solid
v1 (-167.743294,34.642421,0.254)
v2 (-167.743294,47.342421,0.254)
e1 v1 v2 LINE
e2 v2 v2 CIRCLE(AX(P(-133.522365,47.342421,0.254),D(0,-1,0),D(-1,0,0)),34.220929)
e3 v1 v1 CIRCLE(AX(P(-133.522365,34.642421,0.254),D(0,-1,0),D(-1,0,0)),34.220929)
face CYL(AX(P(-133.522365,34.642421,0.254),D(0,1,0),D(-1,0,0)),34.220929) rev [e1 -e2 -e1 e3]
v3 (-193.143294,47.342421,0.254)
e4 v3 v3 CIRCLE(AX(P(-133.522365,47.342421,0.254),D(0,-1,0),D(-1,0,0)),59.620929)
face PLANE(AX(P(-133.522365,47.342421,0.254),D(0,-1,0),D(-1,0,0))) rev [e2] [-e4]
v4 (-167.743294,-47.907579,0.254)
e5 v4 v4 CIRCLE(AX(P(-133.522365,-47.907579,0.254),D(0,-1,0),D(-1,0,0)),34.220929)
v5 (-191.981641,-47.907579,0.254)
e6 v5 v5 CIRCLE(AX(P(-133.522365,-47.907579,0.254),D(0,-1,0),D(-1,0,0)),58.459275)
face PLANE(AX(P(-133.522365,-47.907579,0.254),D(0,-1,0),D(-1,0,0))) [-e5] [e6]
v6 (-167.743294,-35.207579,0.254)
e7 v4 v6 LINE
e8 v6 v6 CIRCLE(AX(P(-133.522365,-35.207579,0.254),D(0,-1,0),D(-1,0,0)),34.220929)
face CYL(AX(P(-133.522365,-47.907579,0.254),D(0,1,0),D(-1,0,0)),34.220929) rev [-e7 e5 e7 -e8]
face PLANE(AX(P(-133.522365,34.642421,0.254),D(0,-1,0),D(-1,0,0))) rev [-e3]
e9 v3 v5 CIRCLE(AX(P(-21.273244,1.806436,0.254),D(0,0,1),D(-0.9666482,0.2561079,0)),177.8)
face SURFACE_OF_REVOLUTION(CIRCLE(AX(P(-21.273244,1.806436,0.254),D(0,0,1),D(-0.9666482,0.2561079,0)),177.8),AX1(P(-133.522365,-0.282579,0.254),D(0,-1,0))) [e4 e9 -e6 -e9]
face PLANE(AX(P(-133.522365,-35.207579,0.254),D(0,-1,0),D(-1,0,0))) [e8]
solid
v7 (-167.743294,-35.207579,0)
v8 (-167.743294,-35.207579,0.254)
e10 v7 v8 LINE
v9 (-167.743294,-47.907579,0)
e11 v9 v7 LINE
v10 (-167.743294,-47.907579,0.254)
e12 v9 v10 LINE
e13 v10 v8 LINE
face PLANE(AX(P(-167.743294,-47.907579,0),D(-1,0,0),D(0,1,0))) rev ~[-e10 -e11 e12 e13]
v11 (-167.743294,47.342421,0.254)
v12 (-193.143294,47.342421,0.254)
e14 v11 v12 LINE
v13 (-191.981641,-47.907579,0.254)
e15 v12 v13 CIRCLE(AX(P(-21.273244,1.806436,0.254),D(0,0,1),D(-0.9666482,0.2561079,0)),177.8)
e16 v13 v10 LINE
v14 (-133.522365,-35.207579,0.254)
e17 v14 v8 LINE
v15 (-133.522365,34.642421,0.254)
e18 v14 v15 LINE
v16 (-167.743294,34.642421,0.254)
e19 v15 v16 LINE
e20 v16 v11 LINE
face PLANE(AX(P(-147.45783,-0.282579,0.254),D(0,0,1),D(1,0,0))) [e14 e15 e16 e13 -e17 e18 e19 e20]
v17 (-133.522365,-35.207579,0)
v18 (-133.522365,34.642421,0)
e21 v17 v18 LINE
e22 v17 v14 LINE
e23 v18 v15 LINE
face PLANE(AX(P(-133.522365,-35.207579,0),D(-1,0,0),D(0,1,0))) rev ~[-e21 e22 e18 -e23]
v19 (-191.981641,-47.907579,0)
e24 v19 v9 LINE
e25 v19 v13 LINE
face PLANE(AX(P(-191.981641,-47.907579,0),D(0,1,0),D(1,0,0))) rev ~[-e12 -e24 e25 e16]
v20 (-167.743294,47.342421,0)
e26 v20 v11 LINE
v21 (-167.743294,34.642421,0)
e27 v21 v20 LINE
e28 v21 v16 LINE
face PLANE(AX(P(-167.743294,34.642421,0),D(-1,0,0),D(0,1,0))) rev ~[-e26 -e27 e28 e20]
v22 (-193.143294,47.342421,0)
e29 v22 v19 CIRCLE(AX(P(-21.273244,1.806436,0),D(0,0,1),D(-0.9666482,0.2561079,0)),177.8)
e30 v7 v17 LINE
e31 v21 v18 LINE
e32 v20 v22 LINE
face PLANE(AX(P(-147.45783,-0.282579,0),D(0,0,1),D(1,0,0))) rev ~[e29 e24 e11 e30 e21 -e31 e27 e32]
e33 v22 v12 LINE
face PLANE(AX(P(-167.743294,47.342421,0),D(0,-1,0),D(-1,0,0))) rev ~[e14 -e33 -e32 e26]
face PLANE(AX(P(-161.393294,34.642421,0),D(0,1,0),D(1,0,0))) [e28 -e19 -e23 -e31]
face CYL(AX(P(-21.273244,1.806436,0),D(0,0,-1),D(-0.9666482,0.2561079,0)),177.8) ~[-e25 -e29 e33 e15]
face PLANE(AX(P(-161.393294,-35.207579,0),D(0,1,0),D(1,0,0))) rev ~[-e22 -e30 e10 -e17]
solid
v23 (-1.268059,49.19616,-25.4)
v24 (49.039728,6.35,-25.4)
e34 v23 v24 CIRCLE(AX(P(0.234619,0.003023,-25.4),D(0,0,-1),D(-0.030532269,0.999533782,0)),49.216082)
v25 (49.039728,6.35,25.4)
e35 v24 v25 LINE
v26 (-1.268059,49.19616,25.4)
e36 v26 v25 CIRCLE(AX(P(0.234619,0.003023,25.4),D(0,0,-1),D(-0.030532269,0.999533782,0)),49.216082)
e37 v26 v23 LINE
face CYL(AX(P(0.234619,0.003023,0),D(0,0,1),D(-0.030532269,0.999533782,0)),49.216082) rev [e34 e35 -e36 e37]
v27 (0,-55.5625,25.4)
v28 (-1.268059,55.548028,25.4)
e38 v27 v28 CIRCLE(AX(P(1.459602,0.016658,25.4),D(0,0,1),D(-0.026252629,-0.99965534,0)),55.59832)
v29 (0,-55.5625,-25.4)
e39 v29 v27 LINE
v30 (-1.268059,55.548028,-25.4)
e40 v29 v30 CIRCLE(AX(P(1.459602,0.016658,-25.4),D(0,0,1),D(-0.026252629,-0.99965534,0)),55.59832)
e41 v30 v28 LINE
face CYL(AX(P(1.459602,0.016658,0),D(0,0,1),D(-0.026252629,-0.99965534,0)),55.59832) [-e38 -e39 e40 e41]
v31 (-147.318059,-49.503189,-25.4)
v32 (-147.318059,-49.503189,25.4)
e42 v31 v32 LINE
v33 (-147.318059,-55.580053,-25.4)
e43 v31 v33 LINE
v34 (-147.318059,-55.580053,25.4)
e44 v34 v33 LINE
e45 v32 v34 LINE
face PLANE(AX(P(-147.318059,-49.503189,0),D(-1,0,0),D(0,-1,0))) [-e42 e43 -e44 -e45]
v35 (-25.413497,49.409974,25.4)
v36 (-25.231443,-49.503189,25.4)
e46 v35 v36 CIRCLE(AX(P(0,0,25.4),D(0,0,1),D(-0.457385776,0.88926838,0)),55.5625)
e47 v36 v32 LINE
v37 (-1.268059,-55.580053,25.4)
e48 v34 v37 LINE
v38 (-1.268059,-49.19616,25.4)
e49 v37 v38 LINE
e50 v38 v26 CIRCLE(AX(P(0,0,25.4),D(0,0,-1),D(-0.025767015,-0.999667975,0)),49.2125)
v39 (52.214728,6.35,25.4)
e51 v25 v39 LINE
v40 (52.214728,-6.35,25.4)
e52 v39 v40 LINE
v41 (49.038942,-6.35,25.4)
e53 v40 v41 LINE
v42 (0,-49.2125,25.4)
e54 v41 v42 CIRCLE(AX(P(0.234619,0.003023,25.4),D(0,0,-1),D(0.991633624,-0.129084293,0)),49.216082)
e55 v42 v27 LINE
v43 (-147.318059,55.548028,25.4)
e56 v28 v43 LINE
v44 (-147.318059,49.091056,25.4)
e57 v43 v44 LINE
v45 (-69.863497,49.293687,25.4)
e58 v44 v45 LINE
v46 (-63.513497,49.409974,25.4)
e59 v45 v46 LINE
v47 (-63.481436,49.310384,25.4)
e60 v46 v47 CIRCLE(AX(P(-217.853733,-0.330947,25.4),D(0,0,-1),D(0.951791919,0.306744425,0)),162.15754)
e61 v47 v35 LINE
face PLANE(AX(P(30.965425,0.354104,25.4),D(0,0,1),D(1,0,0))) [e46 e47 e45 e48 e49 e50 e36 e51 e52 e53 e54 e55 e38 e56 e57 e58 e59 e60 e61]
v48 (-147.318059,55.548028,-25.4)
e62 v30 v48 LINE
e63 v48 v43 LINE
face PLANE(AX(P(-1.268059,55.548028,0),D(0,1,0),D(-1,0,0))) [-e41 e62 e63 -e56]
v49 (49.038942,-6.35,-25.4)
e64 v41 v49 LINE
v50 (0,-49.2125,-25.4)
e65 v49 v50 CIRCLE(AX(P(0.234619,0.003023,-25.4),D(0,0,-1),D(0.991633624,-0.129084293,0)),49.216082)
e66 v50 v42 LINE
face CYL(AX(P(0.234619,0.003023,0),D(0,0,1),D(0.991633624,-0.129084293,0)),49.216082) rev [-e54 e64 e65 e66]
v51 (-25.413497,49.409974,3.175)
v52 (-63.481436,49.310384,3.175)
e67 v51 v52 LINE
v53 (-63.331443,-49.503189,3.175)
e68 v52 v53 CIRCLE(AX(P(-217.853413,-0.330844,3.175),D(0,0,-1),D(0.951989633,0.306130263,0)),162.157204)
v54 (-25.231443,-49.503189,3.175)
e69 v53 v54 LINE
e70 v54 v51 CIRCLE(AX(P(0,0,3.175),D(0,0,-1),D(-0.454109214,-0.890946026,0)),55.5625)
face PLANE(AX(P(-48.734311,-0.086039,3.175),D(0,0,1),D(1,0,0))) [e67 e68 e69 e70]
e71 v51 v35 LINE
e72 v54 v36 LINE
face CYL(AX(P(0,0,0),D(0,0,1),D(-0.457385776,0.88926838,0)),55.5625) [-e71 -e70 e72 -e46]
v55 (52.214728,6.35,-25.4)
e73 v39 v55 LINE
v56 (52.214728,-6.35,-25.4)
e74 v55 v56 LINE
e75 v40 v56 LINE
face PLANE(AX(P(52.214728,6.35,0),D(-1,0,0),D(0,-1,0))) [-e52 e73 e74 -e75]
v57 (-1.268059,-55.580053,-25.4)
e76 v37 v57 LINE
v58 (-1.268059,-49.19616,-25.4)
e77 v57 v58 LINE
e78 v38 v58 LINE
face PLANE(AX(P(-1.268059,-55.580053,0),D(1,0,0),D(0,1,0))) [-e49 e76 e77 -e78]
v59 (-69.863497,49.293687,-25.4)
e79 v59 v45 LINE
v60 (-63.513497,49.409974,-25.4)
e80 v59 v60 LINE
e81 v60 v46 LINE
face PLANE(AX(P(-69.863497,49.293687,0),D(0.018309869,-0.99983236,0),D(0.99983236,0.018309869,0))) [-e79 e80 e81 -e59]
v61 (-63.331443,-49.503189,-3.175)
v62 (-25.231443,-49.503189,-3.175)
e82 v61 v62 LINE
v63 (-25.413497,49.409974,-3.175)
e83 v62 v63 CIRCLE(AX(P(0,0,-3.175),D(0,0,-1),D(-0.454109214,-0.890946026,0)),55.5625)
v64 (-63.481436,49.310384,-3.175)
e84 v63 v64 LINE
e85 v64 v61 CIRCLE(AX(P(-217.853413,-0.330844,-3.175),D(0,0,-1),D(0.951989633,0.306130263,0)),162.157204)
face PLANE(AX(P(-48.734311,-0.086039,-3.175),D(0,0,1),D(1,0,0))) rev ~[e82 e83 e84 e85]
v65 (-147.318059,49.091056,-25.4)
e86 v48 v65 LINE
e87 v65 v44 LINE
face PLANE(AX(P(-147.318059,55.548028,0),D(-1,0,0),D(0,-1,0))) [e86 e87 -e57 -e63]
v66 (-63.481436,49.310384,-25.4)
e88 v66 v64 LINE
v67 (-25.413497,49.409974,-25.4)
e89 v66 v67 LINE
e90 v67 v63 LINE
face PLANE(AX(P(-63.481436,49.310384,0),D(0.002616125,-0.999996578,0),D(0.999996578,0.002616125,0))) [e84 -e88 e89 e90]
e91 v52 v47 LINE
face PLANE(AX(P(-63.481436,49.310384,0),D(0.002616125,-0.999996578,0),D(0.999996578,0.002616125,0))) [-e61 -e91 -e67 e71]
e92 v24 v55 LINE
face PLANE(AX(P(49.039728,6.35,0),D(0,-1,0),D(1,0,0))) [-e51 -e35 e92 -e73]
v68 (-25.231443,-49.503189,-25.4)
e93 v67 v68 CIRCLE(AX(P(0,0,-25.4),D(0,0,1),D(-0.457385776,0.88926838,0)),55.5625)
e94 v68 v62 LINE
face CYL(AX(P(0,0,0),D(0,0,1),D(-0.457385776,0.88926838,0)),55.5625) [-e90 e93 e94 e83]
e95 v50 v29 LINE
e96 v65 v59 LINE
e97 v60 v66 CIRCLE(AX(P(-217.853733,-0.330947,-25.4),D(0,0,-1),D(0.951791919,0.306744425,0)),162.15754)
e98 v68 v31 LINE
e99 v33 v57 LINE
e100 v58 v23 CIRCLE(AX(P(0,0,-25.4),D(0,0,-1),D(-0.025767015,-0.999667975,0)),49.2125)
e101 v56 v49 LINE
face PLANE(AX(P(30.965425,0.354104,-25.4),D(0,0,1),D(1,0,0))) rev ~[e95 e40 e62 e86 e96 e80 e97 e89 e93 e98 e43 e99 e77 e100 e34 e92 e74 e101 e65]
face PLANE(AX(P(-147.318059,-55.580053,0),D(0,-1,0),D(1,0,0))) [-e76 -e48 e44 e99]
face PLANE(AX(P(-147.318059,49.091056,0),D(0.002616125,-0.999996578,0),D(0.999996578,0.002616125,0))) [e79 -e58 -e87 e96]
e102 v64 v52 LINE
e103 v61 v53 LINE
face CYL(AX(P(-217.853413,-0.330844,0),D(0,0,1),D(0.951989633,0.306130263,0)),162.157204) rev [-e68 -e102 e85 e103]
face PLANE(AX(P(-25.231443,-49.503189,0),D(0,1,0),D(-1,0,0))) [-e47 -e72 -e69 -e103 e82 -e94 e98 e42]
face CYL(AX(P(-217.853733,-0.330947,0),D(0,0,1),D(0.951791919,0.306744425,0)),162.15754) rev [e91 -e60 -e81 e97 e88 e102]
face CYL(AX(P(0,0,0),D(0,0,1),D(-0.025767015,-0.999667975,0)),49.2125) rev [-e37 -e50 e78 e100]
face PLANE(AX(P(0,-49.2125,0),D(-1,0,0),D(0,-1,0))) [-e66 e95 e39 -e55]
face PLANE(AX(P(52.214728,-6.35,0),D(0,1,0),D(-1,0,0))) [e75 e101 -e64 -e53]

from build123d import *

# Parameters (mm, degrees)
F1_DEPTH = 25.4
F2_DEPTH = 0.254
F0_W     = 27.8709288151
F0_H     = 69.85
F3_DEPTH = 0.254
F5_DEPTH = 3.175
F6_DEPTH = 25.4


# Not quite as in the source:
# - the program builds the solid bodies; features that only make, move or delete a surface that nothing else refers to are left out


with BuildPart() as f1:
    # F0 (on Top) → F1 (new body, symmetric)
    with BuildSketch(Plane.XY):
        with BuildLine():
            ThreePointArc((-1.2680592233, -49.1961602369), (-49.2125, 0), (-1.2680592233, 49.1961602369))
            Line((-1.2680592233, 49.1961602369), (-1.2680592233, 55.5480281563))
            Line((-1.2680592233, 55.5480281563), (-147.3180592233, 55.5480281563))
            Line((-147.3180592233, 55.5480281563), (-147.3180592233, 49.091055685))
            Line((-147.3180592233, 49.091055685), (-69.8634971885, 49.2936872058))
            Line((-69.8634971885, 49.2936872058), (-63.5134971885, 49.4099743665))
            ThreePointArc((-63.5134971885, 49.4099743665), (-63.4974587718, 49.3601815353), (-63.4814364191, 49.3103835326))
            Line((-63.4814364191, 49.3103835326), (-25.4134971885, 49.4099743665))
            ThreePointArc((-25.4134971885, 49.4099743665), (-55.5624058885, -0.1022650226), (-25.2314432137, -49.5031885802))
            Line((-25.2314432137, -49.5031885802), (-63.3314432137, -49.5031885802))
            Line((-63.3314432137, -49.5031885802), (-69.6814432137, -49.5031885802))
            Line((-69.6814432137, -49.5031885802), (-147.3180592233, -49.5031885802))
            Line((-147.3180592233, -49.5031885802), (-147.3180592233, -55.5800534785))
            Line((-147.3180592233, -55.5800534785), (-1.2680592233, -55.5800534785))
            Line((-1.2680592233, -55.5800534785), (-1.2680592233, -49.1961602369))
        make_face()
    extrude(amount=F1_DEPTH, both=True)

    # F0 (on Top) → F5 (join, symmetric)
    with BuildSketch(Plane.XY):
        with BuildLine():
            ThreePointArc((49.0389416617, -6.35), (32.6236991353, -37.0532891725), (0, -49.2125))
            Line((0, -49.2125), (0, -55.5625))
            ThreePointArc((0, -55.5625), (57.0543020001, 0.6511375212), (-1.2680592233, 55.5480281563))
            Line((-1.2680592233, 55.5480281563), (-1.2680592233, 49.1961602369))
            ThreePointArc((-1.2680592233, 49.1961602369), (32.1458766832, 37.4716025001), (49.0397283671, 6.35))
            Line((49.0397283671, 6.35), (52.2147283671, 6.35))
            Line((52.2147283671, 6.35), (52.2147283671, -6.35))
            Line((52.2147283671, -6.35), (49.0389416617, -6.35))
        make_face()
        with BuildLine():
            Line((-25.4134971885, 49.4099743665), (-63.4814364191, 49.3103835326))
            ThreePointArc((-63.4814364191, 49.3103835326), (-55.6963964132, -0.0846991302), (-63.3314432137, -49.5031885802))
            Line((-63.3314432137, -49.5031885802), (-25.2314432137, -49.5031885802))
            ThreePointArc((-25.2314432137, -49.5031885802), (-55.5624058885, -0.1022650226), (-25.4134971885, 49.4099743665))
        make_face()
    extrude(amount=F5_DEPTH, both=True)

    # F0 (on Top) → F6 (join, symmetric)
    with BuildSketch(Plane.XY):
        with BuildLine():
            ThreePointArc((49.0389416617, -6.35), (32.6236991353, -37.0532891725), (0, -49.2125))
            Line((0, -49.2125), (0, -55.5625))
            ThreePointArc((0, -55.5625), (57.0543020001, 0.6511375212), (-1.2680592233, 55.5480281563))
            Line((-1.2680592233, 55.5480281563), (-1.2680592233, 49.1961602369))
            ThreePointArc((-1.2680592233, 49.1961602369), (32.1458766832, 37.4716025001), (49.0397283671, 6.35))
            Line((49.0397283671, 6.35), (52.2147283671, 6.35))
            Line((52.2147283671, 6.35), (52.2147283671, -6.35))
            Line((52.2147283671, -6.35), (49.0389416617, -6.35))
        make_face()
    extrude(amount=F6_DEPTH, both=True)


with BuildPart() as f2:
    # F0 (on Top) → F2 (new body)
    with BuildSketch(Plane.XY):
        with BuildLine():
            Line((-167.7432940599, 47.3424206634), (-193.1432940599, 47.3424206634))
            ThreePointArc((-193.1432940599, 47.3424206634), (-199.0600226604, -0.3618224561), (-191.9816406704, -47.9075793366))
            Line((-191.9816406704, -47.9075793366), (-167.7432940599, -47.9075793366))
            Line((-167.7432940599, -47.9075793366), (-167.7432940599, -35.2075793366))
            Line((-167.7432940599, -35.2075793366), (-161.3932940599, -35.2075793366))
            Line((-161.3932940599, -35.2075793366), (-161.3932940599, 34.6424206634))
            Line((-161.3932940599, 34.6424206634), (-167.7432940599, 34.6424206634))
            Line((-167.7432940599, 34.6424206634), (-167.7432940599, 47.3424206634))
        make_face()
    extrude(amount=F2_DEPTH)

    # F0 (on Top) → F3 (join)
    with BuildSketch(Plane.XY):
        with Locations((-147.4578296524, -0.2825793366)):
            Rectangle(F0_W, F0_H)
    extrude(amount=F3_DEPTH)


with BuildPart() as f4:
    # F2_face (on face) → F4 (revolve)
    with BuildSketch(Plane(origin=(-167.7046477671, -0.1151986196, 0.254), x_dir=(1, 0, 0), z_dir=(0, 0, 1))):
        with BuildLine():
            Line((34.1822825223, 34.7576192829), (-0.0386462928, 34.7576192829))
            Line((-0.0386462928, 34.7576192829), (-0.0386462928, 47.4576192829))
            Line((-0.0386462928, 47.4576192829), (-25.4386462928, 47.4576192829))
            ThreePointArc((-25.4386462928, 47.4576192829), (-31.3553748933, -0.2466238366), (-24.2769929033, -47.7923807171))
            Line((-24.2769929033, -47.7923807171), (-0.0386462928, -47.7923807171))
            Line((-0.0386462928, -47.7923807171), (-0.0386462928, -35.0923807171))
            Line((-0.0386462928, -35.0923807171), (34.1822825223, -35.0923807171))
            Line((34.1822825223, -35.0923807171), (34.1822825223, 34.7576192829))
        make_face()
    revolve(axis=Axis((-133.5223652449, -0.2825793366, 0.254), (0, -1, 0)))


solid = Compound([f1.part, f2.part, f4.part])
